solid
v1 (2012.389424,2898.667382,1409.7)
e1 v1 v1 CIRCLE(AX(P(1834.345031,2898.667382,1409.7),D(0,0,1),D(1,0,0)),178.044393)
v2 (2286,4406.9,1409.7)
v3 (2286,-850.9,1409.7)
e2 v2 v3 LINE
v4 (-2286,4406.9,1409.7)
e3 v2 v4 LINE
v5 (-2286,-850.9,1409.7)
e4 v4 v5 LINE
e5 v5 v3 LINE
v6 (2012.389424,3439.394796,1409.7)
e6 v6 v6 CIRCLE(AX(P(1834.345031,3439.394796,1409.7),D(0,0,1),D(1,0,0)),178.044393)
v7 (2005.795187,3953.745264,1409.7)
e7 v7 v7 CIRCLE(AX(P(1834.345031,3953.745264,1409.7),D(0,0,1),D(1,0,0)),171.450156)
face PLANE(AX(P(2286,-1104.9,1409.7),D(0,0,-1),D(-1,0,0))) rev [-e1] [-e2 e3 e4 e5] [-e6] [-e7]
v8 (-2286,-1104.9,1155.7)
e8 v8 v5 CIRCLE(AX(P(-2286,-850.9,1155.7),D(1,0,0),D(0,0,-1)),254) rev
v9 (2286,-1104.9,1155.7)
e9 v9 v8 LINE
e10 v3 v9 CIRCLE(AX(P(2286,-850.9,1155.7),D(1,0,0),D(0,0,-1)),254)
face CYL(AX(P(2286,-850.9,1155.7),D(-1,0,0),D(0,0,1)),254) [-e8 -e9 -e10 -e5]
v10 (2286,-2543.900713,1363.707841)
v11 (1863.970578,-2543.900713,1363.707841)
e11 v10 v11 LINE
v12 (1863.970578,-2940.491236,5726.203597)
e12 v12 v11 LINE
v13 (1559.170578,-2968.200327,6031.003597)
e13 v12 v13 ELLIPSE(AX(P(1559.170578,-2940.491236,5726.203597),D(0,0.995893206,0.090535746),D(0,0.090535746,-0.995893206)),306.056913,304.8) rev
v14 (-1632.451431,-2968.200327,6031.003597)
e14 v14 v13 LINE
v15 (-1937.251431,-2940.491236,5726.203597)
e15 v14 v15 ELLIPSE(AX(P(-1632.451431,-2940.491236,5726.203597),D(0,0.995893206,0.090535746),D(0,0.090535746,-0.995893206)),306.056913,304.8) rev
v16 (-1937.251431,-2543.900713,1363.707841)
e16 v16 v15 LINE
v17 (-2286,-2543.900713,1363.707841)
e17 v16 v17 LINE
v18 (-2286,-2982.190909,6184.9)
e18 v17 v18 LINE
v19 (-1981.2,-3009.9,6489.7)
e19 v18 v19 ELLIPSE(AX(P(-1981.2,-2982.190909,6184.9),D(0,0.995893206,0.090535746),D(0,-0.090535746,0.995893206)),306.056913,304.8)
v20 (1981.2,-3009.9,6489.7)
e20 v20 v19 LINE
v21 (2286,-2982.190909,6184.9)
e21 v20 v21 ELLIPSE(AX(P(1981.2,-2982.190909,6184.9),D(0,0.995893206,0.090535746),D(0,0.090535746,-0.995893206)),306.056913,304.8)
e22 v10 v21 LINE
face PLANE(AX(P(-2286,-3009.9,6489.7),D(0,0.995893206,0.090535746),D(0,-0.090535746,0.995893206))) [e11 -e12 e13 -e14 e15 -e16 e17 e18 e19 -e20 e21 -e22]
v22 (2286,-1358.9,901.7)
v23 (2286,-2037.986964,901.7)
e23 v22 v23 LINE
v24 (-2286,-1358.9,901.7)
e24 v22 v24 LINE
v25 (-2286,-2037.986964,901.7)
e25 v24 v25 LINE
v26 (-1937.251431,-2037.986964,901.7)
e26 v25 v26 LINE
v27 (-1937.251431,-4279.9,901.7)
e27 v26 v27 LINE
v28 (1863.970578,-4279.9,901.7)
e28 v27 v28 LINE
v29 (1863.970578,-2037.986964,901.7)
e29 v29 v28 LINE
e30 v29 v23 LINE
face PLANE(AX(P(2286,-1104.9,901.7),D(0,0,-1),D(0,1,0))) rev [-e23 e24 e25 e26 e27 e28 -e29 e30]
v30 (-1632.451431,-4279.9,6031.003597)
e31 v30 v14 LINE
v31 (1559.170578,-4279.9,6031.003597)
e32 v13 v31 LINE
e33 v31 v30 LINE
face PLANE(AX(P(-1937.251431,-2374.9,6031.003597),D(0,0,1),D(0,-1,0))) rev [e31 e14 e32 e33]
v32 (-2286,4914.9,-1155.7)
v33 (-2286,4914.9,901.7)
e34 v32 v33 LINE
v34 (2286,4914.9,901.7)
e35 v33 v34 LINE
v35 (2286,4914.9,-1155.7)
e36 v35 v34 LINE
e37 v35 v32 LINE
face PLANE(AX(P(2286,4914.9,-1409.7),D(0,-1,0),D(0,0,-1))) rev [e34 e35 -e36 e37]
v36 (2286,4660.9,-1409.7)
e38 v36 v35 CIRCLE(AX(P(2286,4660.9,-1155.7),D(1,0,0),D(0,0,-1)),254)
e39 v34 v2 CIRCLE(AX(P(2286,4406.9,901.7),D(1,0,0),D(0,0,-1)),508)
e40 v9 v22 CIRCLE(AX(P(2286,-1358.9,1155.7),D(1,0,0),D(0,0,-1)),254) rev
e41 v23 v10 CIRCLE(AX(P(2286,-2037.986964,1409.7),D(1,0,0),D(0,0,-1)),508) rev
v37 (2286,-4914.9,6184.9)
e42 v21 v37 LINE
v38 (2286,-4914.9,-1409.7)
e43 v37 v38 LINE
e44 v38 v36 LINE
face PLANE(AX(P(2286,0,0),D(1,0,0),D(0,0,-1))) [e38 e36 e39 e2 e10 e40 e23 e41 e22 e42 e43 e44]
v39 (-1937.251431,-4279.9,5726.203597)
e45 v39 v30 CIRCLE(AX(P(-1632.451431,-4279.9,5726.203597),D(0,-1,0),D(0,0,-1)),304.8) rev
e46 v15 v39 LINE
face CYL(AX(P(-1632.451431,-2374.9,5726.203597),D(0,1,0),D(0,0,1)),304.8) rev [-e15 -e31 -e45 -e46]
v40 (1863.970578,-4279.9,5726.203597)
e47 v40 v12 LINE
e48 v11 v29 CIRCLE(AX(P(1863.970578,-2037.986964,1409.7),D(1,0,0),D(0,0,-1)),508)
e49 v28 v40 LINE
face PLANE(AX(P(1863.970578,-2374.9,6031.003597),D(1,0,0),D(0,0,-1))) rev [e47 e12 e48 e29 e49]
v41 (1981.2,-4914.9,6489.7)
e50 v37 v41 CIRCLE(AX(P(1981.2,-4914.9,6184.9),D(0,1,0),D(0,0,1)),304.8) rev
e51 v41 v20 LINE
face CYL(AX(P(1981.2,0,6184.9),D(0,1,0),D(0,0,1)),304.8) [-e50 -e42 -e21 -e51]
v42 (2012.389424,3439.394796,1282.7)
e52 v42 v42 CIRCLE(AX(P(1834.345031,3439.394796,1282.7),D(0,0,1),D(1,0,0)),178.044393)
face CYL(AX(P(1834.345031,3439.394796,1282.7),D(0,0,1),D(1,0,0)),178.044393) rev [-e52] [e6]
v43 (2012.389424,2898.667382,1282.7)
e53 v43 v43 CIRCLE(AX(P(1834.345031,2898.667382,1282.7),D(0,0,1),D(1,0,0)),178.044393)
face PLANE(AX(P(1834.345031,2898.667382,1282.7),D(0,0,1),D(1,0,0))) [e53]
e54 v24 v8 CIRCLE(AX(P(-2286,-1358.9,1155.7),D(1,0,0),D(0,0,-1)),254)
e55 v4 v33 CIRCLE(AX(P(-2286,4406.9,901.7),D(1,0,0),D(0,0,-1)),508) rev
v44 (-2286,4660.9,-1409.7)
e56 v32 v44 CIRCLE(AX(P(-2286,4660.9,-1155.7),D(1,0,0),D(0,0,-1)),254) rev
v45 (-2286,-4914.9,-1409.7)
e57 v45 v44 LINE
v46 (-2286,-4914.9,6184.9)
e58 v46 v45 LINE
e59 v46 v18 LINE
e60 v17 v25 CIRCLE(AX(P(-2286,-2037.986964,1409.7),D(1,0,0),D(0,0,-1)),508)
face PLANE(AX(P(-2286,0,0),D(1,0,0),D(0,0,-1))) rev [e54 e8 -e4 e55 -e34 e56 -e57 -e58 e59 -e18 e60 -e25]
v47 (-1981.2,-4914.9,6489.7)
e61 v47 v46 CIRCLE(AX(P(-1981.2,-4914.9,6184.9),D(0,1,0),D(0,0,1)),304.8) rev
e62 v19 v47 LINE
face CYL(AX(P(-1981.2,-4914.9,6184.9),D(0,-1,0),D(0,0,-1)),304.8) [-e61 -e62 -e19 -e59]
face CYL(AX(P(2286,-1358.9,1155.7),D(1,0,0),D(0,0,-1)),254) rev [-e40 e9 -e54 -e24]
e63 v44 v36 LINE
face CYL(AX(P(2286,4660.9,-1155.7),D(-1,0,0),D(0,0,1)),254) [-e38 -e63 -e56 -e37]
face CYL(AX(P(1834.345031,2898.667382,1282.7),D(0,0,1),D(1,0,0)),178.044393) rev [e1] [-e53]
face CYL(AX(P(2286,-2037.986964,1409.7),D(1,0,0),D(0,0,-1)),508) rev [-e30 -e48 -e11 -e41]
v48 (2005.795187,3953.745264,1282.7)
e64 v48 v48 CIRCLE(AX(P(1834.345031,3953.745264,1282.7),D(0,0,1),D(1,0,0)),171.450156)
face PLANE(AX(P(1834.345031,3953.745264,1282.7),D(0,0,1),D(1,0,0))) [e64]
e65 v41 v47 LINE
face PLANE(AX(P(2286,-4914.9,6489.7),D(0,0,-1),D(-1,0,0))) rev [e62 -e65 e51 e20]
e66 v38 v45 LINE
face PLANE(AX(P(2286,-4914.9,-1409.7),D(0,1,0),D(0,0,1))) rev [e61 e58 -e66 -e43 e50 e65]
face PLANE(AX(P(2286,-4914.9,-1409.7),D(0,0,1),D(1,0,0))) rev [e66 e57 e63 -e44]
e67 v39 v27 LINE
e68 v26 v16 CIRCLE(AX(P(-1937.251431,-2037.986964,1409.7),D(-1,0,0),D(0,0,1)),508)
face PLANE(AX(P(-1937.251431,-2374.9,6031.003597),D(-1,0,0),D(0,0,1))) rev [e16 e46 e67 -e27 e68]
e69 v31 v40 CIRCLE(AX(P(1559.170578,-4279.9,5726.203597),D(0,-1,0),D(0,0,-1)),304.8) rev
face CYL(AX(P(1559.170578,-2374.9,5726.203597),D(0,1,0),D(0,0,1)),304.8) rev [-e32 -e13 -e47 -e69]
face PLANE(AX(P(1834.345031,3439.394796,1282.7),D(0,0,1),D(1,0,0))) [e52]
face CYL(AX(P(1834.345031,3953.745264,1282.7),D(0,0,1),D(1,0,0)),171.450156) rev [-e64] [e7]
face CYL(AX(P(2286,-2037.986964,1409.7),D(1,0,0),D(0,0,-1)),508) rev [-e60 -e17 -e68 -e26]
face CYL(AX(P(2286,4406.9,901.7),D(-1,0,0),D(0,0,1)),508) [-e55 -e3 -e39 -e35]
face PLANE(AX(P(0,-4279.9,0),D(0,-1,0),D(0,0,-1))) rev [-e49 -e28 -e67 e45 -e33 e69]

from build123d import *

# Parameters (mm, degrees)
BOSS_EXTRUDE4_DEPTH = 2286
FILLET6_R           = 508
FILLET8_R           = 254
FILLET13_R          = 508
FILLET17_R          = 254
SKETCH6_R           = 171.450155781
SKETCH6_R_2         = 178.044392542
CUT_EXTRUDE6_DEPTH  = 127
BOSS_EXTRUDE5_DEPTH = 4572
SKETCH8_W           = 3801.222009046
SKETCH8_H           = 5129.303596945
CUT_EXTRUDE7_DEPTH  = 2540
SKETCH9_W           = 3801.222009046
SKETCH9_H           = 5129.303596945
BOSS_EXTRUDE6_DEPTH = 635
FILLET20_R          = 304.8
FILLET22_R          = 508


with BuildPart() as part:
    # Sketch1 → Boss-Extrude4 (new, symmetric)
    with BuildSketch(Plane(origin=(0, 0, 0), x_dir=(0, 0, -1), z_dir=(1, 0, 0))):
        Polygon((-1409.7, -4914.9), (-6489.7, -4914.9), (-6489.7, -3009.9), (-901.7, -3009.9), (-901.7, -1104.9), (-1409.7, -1104.9), (-1409.7, 4914.9), (1409.7, 4914.9), (1409.7, -4914.9), align=None)
    extrude(amount=BOSS_EXTRUDE4_DEPTH, both=True)

    # Fillet6
    fillet6_edges = [part.edges().sort_by_distance(p)[0] for p in [
        (0, 4914.9, 1409.7),
    ]]
    fillet(fillet6_edges, radius=FILLET6_R)

    # Fillet8
    fillet8_edges = [part.edges().sort_by_distance(p)[0] for p in [
        (0, 4914.9, -1409.7),
        (0, -1104.9, 1409.7),
    ]]
    fillet(fillet8_edges, radius=FILLET8_R)

    # Fillet13
    fillet13_edges = [part.edges().sort_by_distance(p)[0] for p in [
        (0, -3009.9, 901.7),
    ]]
    fillet(fillet13_edges, radius=FILLET13_R)

    # Fillet17
    fillet17_edges = [part.edges().sort_by_distance(p)[0] for p in [
        (0, -1104.9, 901.7),
    ]]
    fillet(fillet17_edges, radius=FILLET17_R - 0.0001)  # a hair under: the kernel refuses the full size

    # Sketch6 → Cut-Extrude6 (cut)
    with BuildSketch(Plane.XY.offset(1409.7)):
        with Locations((1834.345031139, 3953.745263641)):
            Circle(SKETCH6_R)
        with Locations((1834.345031139, 3439.394796298)):
            Circle(SKETCH6_R_2)
        with Locations((1834.345031139, 2898.667381912)):
            Circle(SKETCH6_R_2)
    extrude(amount=-CUT_EXTRUDE6_DEPTH, mode=Mode.SUBTRACT)

    # Sketch7 → Boss-Extrude5 (add)
    with BuildSketch(Plane(origin=(2286, 0, 0), x_dir=(0, 0, -1), z_dir=(1, 0, 0))):
        Polygon((-6489.7, -3009.9), (-901.7, -2501.9), (-901.7, -3009.9), align=None)
    extrude(amount=-BOSS_EXTRUDE5_DEPTH)

    # Sketch8 → Cut-Extrude7 (cut)
    with BuildSketch(Plane.XZ.offset(4914.9)):
        with Locations((-36.640426205, 3466.351798472)):
            Rectangle(SKETCH8_W, SKETCH8_H)
    extrude(amount=-CUT_EXTRUDE7_DEPTH, mode=Mode.SUBTRACT)

    # Sketch9 → Boss-Extrude6 (add)
    with BuildSketch(Plane.XZ.offset(4914.9)):
        with Locations((-36.640426205, 3466.351798472)):
            Rectangle(SKETCH9_W, SKETCH9_H)
    extrude(amount=-BOSS_EXTRUDE6_DEPTH)

    # Fillet20
    fillet20_edges = [part.edges().sort_by_distance(p)[0] for p in [
        (-2286, -3962.4, 6489.7),
        (2286, -3962.4, 6489.7),
        (-1937.251430728, -3624.050163498, 6031.003596945),
        (1863.970578318, -3624.050163498, 6031.003596945),
    ]]
    fillet(fillet20_edges, radius=FILLET20_R)

    # Fillet22
    fillet22_edges = [part.edges().sort_by_distance(p)[0] for p in [
        (-2111.625715364, -2501.9, 901.7),
        (2074.985289159, -2501.9, 901.7),
    ]]
    fillet(fillet22_edges, radius=FILLET22_R)


solid = part.part
